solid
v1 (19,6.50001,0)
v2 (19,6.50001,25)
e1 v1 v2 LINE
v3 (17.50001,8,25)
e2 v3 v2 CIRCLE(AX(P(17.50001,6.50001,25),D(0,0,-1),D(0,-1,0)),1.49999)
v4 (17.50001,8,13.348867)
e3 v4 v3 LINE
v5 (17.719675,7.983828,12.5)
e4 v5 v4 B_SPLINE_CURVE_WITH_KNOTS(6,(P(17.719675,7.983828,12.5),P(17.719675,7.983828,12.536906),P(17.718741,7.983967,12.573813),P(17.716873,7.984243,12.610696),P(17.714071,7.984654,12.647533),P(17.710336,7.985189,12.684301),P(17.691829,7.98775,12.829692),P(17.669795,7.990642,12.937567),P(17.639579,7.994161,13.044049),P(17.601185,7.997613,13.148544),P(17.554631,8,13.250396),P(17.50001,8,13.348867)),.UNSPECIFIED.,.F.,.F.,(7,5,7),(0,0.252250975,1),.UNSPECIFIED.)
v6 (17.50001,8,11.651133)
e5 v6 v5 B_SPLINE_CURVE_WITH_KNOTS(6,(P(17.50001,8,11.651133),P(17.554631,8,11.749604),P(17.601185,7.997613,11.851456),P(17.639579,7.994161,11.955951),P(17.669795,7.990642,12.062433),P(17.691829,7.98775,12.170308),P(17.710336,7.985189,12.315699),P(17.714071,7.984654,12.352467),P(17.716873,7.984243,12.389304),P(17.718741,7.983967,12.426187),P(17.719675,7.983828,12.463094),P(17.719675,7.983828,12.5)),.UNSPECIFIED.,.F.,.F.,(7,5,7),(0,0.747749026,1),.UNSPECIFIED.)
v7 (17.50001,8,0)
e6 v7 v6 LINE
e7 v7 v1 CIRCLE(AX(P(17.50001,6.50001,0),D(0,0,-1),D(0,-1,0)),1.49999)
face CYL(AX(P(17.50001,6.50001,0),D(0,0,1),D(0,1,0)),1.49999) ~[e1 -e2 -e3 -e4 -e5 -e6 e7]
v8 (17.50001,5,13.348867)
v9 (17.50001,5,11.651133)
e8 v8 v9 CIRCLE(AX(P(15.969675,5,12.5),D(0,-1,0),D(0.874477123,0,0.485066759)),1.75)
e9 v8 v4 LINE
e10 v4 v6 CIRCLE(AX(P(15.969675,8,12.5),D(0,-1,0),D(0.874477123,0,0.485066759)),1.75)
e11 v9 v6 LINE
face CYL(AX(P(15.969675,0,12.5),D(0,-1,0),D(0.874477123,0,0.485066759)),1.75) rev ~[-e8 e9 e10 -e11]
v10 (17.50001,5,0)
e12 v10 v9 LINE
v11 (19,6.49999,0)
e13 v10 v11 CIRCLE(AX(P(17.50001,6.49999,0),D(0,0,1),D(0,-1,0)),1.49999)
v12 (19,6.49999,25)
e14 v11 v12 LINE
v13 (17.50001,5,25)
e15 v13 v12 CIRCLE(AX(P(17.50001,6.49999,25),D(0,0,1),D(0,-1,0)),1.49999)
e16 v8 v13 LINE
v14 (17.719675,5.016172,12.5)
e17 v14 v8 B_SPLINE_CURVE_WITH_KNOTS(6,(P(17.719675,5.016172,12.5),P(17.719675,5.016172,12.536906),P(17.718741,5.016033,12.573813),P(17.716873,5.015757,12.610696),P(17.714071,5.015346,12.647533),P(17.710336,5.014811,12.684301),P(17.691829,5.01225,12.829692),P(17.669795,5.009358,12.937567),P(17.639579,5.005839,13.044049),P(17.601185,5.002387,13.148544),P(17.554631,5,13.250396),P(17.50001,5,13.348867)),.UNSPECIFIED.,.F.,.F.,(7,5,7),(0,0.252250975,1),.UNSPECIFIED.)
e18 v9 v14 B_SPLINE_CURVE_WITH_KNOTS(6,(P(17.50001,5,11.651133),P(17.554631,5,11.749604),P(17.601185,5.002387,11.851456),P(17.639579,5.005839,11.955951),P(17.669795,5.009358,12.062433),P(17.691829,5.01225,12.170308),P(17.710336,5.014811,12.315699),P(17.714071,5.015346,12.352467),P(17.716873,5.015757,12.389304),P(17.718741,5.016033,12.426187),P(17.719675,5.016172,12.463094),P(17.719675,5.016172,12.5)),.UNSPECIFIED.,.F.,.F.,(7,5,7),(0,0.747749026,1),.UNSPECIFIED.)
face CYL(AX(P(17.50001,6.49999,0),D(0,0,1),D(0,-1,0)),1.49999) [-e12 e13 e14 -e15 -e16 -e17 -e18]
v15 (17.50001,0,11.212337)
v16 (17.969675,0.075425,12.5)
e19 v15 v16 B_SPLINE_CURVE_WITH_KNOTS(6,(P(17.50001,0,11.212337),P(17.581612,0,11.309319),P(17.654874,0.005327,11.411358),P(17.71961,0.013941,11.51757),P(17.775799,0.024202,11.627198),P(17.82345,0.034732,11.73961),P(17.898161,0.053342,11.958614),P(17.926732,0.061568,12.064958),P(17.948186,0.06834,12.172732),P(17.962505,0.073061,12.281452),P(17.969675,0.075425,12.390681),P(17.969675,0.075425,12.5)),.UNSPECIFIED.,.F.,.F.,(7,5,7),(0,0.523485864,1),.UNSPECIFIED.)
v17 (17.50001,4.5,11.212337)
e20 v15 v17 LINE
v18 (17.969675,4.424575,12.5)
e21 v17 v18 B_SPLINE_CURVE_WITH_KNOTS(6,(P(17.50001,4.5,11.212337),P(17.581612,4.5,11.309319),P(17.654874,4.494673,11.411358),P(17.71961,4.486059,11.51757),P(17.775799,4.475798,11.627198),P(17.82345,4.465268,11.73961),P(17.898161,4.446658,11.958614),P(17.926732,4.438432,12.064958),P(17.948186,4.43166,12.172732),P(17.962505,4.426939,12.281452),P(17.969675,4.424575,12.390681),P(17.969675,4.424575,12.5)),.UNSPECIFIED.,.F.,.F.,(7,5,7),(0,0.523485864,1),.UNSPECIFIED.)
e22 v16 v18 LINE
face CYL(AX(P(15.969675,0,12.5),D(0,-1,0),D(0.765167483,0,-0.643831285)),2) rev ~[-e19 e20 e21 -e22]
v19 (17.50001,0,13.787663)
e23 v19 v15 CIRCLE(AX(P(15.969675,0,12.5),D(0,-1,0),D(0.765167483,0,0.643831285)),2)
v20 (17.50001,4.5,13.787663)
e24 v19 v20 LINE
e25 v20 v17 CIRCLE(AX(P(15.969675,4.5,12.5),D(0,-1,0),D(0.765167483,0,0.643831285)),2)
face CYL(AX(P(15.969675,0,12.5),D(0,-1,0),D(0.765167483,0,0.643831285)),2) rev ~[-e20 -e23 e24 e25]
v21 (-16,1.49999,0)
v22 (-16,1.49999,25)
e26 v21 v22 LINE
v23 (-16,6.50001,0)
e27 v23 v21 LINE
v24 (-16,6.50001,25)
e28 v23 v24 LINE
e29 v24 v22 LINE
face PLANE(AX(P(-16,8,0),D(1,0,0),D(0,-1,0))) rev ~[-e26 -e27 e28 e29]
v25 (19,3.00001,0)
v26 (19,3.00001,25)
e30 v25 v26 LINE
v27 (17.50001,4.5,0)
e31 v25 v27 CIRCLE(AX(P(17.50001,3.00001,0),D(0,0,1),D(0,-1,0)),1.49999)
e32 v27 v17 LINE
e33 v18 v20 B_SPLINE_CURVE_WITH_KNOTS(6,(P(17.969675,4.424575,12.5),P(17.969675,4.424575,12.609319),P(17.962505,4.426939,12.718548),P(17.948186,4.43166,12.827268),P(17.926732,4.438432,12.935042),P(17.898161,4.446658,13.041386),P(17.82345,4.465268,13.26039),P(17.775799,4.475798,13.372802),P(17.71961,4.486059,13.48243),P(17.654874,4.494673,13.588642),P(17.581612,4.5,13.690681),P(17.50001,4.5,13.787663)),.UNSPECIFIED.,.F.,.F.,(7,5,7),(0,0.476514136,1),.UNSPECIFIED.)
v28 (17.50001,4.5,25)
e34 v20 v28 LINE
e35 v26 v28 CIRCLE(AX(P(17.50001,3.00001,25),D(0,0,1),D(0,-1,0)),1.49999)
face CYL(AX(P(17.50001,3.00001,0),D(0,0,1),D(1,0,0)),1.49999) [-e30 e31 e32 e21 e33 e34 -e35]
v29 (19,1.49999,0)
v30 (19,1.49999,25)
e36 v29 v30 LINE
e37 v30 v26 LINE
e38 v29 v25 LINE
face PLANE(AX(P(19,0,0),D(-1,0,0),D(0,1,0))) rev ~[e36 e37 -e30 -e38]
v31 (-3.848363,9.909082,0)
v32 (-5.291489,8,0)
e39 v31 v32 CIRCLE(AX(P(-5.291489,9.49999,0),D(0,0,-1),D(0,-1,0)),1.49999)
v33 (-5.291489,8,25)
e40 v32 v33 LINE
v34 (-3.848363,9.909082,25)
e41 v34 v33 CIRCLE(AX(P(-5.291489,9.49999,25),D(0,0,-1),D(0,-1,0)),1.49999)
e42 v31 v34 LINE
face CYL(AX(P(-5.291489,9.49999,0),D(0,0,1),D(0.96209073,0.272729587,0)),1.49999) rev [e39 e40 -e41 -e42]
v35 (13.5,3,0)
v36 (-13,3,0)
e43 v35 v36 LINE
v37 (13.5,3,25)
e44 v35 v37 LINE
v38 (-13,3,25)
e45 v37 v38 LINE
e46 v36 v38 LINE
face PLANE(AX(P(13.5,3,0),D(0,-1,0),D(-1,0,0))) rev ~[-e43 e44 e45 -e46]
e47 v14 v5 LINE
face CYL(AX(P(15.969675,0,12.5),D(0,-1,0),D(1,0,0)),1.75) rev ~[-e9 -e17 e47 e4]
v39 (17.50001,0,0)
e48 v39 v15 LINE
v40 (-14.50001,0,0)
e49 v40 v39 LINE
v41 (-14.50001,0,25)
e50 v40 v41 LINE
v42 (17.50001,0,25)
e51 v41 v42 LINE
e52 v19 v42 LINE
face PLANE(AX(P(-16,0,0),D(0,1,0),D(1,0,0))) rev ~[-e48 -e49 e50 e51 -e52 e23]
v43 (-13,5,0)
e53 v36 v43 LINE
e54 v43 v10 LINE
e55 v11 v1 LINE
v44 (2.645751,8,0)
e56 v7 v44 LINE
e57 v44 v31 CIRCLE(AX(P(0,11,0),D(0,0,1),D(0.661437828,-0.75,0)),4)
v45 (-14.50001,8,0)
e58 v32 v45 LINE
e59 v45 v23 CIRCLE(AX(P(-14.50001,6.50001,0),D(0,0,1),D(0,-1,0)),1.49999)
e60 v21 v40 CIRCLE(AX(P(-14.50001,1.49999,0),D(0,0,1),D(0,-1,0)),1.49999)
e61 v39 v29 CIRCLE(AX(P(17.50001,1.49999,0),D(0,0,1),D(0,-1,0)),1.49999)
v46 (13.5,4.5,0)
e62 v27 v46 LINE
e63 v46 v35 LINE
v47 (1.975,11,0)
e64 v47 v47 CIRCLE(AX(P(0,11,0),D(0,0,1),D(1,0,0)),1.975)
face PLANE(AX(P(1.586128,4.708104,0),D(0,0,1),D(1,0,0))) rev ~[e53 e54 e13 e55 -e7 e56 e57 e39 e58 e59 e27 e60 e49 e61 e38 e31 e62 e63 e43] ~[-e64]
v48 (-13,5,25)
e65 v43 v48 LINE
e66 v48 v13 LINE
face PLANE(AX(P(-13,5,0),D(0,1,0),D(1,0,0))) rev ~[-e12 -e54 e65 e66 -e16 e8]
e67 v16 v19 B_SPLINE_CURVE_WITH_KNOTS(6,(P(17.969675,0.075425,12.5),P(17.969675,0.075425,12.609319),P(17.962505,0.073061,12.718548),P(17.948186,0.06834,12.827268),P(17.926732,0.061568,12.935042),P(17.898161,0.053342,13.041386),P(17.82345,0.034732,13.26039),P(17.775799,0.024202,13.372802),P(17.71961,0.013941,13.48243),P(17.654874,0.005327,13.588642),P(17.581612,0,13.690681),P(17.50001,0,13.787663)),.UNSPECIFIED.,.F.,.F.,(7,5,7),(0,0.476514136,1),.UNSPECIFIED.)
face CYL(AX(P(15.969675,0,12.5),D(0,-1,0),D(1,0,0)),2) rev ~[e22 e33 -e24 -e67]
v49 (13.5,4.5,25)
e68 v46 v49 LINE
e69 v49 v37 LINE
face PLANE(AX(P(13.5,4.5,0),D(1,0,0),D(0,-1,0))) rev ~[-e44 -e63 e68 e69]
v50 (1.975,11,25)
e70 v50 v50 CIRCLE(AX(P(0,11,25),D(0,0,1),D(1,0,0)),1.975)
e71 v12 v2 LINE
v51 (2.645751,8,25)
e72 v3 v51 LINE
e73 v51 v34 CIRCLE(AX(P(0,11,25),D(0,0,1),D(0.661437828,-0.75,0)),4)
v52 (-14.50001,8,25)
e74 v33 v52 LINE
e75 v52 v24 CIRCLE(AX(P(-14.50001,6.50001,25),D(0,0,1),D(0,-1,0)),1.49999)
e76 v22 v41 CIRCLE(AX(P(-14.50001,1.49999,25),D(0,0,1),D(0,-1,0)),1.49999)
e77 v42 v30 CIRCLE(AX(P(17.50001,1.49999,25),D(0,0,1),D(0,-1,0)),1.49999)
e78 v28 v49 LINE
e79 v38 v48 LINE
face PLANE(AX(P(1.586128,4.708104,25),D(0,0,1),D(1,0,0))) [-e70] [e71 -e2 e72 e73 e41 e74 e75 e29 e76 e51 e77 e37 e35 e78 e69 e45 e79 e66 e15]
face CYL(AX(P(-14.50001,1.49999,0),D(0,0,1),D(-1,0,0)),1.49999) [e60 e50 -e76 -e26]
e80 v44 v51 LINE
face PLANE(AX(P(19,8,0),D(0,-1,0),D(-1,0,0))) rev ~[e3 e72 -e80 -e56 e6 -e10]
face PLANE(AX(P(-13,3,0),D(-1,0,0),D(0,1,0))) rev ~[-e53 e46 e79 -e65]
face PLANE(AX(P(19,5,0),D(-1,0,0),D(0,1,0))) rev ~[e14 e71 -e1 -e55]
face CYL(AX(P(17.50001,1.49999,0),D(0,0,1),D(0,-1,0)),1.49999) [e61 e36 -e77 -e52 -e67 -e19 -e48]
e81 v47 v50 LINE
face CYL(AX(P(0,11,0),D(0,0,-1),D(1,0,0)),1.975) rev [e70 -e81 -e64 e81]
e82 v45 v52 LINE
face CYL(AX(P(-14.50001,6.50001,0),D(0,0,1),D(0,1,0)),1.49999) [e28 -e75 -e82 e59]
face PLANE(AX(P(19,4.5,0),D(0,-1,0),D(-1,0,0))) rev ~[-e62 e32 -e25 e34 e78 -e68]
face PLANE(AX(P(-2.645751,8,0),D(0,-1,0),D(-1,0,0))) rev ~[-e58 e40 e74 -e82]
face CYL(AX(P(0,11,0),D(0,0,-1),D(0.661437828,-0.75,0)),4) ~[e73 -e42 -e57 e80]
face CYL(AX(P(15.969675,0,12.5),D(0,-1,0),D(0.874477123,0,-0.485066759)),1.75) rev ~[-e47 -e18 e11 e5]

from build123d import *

# Parameters (mm, degrees)
F0_R     = 1.975
F1_DEPTH = 25
F2_R     = 1.49999
F4_DEPTH = 25
F5_DEPTH = 4.8


# Not quite as in the source:
# - a fillet or chamfer is up to 0.001 mm smaller than in the source, because OpenCascade refuses the exact size
# - a feature names something its author has since deleted; it is built from what else it names


with BuildPart() as f1:
    # F0 (on Top) → F1 (new body)
    with BuildSketch(Plane.XY):
        with BuildLine():
            Line((19, 8), (2.6457513111, 8))
            ThreePointArc((2.6457513111, 8), (0, 15), (-2.6457513111, 8))
            Line((-2.6457513111, 8), (-16, 8))
            Line((-16, 8), (-16, 0))
            Line((-16, 0), (19, 0))
            Line((19, 0), (19, 3))
            Line((19, 3), (17.2, 3))
            Line((17.2, 3), (13.5, 3))
            Line((13.5, 3), (-13, 3))
            Line((-13, 3), (-13, 5))
            Line((-13, 5), (19, 5))
            Line((19, 5), (19, 8))
        make_face()
        with Locations((0, 11)):
            Circle(F0_R, mode=Mode.SUBTRACT)
        Polygon((17.2, 3), (19, 3), (19, 4.5), (13.5, 4.5), (13.5, 3), align=None)
    extrude(amount=F1_DEPTH)

    # F2 (radius 1.5 in the source; OpenCascade refuses exactly that, so slightly less here)
    f2_edges = [f1.edges().sort_by_distance(p)[0] for p in [
        (-16, 8, 12.5),
        (-16, 0, 12.5),
        (19, 0, 12.5),
        (19, 5, 12.5),
        (19, 4.5, 12.5),
        (-2.645751, 8, 12.5),
        (19, 8, 12.5),
    ]]
    fillet(f2_edges, radius=F2_R)

    # F3 (on face) → F4 (cut)
    with BuildSketch(Plane.XZ):
        with BuildLine():
            Line((17.50001, 11.6511331714), (17.50001, 13.3488668286))
            ThreePointArc((17.50001, 13.3488668286), (14.2196750343, 12.5), (17.50001, 11.6511331714))
        make_face()
        with BuildLine():
            ThreePointArc((17.7196750343, 12.5), (17.6638689709, 12.9384140794), (17.50001, 13.3488668286))
            Line((17.50001, 13.3488668286), (17.50001, 11.6511331714))
            ThreePointArc((17.50001, 11.6511331714), (17.6638689709, 12.0615859206), (17.7196750343, 12.5))
        make_face()
    extrude(amount=-F4_DEPTH, mode=Mode.SUBTRACT)

    # F3 (on face) → F5 (cut)
    with BuildSketch(Plane.XZ):
        with BuildLine():
            Line((17.50001, 13.3488668286), (17.50001, 13.7876625694))
            ThreePointArc((17.50001, 13.7876625694), (13.9696750343, 12.5), (17.50001, 11.2123374306))
            Line((17.50001, 11.2123374306), (17.50001, 11.6511331714))
            ThreePointArc((17.50001, 11.6511331714), (14.2196750343, 12.5), (17.50001, 13.3488668286))
        make_face()
        with BuildLine():
            ThreePointArc((17.50001, 11.2123374306), (17.8485935971, 11.8146788824), (17.9696750343, 12.5))
            ThreePointArc((17.9696750343, 12.5), (17.8485935971, 13.1853211176), (17.50001, 13.7876625694))
            Line((17.50001, 13.7876625694), (17.50001, 13.3488668286))
            ThreePointArc((17.50001, 13.3488668286), (17.6638689709, 12.9384140794), (17.7196750343, 12.5))
            ThreePointArc((17.7196750343, 12.5), (17.6638689709, 12.0615859206), (17.50001, 11.6511331714))
            Line((17.50001, 11.6511331714), (17.50001, 11.2123374306))
        make_face()
    extrude(amount=-F5_DEPTH, mode=Mode.SUBTRACT)


solid = f1.part
